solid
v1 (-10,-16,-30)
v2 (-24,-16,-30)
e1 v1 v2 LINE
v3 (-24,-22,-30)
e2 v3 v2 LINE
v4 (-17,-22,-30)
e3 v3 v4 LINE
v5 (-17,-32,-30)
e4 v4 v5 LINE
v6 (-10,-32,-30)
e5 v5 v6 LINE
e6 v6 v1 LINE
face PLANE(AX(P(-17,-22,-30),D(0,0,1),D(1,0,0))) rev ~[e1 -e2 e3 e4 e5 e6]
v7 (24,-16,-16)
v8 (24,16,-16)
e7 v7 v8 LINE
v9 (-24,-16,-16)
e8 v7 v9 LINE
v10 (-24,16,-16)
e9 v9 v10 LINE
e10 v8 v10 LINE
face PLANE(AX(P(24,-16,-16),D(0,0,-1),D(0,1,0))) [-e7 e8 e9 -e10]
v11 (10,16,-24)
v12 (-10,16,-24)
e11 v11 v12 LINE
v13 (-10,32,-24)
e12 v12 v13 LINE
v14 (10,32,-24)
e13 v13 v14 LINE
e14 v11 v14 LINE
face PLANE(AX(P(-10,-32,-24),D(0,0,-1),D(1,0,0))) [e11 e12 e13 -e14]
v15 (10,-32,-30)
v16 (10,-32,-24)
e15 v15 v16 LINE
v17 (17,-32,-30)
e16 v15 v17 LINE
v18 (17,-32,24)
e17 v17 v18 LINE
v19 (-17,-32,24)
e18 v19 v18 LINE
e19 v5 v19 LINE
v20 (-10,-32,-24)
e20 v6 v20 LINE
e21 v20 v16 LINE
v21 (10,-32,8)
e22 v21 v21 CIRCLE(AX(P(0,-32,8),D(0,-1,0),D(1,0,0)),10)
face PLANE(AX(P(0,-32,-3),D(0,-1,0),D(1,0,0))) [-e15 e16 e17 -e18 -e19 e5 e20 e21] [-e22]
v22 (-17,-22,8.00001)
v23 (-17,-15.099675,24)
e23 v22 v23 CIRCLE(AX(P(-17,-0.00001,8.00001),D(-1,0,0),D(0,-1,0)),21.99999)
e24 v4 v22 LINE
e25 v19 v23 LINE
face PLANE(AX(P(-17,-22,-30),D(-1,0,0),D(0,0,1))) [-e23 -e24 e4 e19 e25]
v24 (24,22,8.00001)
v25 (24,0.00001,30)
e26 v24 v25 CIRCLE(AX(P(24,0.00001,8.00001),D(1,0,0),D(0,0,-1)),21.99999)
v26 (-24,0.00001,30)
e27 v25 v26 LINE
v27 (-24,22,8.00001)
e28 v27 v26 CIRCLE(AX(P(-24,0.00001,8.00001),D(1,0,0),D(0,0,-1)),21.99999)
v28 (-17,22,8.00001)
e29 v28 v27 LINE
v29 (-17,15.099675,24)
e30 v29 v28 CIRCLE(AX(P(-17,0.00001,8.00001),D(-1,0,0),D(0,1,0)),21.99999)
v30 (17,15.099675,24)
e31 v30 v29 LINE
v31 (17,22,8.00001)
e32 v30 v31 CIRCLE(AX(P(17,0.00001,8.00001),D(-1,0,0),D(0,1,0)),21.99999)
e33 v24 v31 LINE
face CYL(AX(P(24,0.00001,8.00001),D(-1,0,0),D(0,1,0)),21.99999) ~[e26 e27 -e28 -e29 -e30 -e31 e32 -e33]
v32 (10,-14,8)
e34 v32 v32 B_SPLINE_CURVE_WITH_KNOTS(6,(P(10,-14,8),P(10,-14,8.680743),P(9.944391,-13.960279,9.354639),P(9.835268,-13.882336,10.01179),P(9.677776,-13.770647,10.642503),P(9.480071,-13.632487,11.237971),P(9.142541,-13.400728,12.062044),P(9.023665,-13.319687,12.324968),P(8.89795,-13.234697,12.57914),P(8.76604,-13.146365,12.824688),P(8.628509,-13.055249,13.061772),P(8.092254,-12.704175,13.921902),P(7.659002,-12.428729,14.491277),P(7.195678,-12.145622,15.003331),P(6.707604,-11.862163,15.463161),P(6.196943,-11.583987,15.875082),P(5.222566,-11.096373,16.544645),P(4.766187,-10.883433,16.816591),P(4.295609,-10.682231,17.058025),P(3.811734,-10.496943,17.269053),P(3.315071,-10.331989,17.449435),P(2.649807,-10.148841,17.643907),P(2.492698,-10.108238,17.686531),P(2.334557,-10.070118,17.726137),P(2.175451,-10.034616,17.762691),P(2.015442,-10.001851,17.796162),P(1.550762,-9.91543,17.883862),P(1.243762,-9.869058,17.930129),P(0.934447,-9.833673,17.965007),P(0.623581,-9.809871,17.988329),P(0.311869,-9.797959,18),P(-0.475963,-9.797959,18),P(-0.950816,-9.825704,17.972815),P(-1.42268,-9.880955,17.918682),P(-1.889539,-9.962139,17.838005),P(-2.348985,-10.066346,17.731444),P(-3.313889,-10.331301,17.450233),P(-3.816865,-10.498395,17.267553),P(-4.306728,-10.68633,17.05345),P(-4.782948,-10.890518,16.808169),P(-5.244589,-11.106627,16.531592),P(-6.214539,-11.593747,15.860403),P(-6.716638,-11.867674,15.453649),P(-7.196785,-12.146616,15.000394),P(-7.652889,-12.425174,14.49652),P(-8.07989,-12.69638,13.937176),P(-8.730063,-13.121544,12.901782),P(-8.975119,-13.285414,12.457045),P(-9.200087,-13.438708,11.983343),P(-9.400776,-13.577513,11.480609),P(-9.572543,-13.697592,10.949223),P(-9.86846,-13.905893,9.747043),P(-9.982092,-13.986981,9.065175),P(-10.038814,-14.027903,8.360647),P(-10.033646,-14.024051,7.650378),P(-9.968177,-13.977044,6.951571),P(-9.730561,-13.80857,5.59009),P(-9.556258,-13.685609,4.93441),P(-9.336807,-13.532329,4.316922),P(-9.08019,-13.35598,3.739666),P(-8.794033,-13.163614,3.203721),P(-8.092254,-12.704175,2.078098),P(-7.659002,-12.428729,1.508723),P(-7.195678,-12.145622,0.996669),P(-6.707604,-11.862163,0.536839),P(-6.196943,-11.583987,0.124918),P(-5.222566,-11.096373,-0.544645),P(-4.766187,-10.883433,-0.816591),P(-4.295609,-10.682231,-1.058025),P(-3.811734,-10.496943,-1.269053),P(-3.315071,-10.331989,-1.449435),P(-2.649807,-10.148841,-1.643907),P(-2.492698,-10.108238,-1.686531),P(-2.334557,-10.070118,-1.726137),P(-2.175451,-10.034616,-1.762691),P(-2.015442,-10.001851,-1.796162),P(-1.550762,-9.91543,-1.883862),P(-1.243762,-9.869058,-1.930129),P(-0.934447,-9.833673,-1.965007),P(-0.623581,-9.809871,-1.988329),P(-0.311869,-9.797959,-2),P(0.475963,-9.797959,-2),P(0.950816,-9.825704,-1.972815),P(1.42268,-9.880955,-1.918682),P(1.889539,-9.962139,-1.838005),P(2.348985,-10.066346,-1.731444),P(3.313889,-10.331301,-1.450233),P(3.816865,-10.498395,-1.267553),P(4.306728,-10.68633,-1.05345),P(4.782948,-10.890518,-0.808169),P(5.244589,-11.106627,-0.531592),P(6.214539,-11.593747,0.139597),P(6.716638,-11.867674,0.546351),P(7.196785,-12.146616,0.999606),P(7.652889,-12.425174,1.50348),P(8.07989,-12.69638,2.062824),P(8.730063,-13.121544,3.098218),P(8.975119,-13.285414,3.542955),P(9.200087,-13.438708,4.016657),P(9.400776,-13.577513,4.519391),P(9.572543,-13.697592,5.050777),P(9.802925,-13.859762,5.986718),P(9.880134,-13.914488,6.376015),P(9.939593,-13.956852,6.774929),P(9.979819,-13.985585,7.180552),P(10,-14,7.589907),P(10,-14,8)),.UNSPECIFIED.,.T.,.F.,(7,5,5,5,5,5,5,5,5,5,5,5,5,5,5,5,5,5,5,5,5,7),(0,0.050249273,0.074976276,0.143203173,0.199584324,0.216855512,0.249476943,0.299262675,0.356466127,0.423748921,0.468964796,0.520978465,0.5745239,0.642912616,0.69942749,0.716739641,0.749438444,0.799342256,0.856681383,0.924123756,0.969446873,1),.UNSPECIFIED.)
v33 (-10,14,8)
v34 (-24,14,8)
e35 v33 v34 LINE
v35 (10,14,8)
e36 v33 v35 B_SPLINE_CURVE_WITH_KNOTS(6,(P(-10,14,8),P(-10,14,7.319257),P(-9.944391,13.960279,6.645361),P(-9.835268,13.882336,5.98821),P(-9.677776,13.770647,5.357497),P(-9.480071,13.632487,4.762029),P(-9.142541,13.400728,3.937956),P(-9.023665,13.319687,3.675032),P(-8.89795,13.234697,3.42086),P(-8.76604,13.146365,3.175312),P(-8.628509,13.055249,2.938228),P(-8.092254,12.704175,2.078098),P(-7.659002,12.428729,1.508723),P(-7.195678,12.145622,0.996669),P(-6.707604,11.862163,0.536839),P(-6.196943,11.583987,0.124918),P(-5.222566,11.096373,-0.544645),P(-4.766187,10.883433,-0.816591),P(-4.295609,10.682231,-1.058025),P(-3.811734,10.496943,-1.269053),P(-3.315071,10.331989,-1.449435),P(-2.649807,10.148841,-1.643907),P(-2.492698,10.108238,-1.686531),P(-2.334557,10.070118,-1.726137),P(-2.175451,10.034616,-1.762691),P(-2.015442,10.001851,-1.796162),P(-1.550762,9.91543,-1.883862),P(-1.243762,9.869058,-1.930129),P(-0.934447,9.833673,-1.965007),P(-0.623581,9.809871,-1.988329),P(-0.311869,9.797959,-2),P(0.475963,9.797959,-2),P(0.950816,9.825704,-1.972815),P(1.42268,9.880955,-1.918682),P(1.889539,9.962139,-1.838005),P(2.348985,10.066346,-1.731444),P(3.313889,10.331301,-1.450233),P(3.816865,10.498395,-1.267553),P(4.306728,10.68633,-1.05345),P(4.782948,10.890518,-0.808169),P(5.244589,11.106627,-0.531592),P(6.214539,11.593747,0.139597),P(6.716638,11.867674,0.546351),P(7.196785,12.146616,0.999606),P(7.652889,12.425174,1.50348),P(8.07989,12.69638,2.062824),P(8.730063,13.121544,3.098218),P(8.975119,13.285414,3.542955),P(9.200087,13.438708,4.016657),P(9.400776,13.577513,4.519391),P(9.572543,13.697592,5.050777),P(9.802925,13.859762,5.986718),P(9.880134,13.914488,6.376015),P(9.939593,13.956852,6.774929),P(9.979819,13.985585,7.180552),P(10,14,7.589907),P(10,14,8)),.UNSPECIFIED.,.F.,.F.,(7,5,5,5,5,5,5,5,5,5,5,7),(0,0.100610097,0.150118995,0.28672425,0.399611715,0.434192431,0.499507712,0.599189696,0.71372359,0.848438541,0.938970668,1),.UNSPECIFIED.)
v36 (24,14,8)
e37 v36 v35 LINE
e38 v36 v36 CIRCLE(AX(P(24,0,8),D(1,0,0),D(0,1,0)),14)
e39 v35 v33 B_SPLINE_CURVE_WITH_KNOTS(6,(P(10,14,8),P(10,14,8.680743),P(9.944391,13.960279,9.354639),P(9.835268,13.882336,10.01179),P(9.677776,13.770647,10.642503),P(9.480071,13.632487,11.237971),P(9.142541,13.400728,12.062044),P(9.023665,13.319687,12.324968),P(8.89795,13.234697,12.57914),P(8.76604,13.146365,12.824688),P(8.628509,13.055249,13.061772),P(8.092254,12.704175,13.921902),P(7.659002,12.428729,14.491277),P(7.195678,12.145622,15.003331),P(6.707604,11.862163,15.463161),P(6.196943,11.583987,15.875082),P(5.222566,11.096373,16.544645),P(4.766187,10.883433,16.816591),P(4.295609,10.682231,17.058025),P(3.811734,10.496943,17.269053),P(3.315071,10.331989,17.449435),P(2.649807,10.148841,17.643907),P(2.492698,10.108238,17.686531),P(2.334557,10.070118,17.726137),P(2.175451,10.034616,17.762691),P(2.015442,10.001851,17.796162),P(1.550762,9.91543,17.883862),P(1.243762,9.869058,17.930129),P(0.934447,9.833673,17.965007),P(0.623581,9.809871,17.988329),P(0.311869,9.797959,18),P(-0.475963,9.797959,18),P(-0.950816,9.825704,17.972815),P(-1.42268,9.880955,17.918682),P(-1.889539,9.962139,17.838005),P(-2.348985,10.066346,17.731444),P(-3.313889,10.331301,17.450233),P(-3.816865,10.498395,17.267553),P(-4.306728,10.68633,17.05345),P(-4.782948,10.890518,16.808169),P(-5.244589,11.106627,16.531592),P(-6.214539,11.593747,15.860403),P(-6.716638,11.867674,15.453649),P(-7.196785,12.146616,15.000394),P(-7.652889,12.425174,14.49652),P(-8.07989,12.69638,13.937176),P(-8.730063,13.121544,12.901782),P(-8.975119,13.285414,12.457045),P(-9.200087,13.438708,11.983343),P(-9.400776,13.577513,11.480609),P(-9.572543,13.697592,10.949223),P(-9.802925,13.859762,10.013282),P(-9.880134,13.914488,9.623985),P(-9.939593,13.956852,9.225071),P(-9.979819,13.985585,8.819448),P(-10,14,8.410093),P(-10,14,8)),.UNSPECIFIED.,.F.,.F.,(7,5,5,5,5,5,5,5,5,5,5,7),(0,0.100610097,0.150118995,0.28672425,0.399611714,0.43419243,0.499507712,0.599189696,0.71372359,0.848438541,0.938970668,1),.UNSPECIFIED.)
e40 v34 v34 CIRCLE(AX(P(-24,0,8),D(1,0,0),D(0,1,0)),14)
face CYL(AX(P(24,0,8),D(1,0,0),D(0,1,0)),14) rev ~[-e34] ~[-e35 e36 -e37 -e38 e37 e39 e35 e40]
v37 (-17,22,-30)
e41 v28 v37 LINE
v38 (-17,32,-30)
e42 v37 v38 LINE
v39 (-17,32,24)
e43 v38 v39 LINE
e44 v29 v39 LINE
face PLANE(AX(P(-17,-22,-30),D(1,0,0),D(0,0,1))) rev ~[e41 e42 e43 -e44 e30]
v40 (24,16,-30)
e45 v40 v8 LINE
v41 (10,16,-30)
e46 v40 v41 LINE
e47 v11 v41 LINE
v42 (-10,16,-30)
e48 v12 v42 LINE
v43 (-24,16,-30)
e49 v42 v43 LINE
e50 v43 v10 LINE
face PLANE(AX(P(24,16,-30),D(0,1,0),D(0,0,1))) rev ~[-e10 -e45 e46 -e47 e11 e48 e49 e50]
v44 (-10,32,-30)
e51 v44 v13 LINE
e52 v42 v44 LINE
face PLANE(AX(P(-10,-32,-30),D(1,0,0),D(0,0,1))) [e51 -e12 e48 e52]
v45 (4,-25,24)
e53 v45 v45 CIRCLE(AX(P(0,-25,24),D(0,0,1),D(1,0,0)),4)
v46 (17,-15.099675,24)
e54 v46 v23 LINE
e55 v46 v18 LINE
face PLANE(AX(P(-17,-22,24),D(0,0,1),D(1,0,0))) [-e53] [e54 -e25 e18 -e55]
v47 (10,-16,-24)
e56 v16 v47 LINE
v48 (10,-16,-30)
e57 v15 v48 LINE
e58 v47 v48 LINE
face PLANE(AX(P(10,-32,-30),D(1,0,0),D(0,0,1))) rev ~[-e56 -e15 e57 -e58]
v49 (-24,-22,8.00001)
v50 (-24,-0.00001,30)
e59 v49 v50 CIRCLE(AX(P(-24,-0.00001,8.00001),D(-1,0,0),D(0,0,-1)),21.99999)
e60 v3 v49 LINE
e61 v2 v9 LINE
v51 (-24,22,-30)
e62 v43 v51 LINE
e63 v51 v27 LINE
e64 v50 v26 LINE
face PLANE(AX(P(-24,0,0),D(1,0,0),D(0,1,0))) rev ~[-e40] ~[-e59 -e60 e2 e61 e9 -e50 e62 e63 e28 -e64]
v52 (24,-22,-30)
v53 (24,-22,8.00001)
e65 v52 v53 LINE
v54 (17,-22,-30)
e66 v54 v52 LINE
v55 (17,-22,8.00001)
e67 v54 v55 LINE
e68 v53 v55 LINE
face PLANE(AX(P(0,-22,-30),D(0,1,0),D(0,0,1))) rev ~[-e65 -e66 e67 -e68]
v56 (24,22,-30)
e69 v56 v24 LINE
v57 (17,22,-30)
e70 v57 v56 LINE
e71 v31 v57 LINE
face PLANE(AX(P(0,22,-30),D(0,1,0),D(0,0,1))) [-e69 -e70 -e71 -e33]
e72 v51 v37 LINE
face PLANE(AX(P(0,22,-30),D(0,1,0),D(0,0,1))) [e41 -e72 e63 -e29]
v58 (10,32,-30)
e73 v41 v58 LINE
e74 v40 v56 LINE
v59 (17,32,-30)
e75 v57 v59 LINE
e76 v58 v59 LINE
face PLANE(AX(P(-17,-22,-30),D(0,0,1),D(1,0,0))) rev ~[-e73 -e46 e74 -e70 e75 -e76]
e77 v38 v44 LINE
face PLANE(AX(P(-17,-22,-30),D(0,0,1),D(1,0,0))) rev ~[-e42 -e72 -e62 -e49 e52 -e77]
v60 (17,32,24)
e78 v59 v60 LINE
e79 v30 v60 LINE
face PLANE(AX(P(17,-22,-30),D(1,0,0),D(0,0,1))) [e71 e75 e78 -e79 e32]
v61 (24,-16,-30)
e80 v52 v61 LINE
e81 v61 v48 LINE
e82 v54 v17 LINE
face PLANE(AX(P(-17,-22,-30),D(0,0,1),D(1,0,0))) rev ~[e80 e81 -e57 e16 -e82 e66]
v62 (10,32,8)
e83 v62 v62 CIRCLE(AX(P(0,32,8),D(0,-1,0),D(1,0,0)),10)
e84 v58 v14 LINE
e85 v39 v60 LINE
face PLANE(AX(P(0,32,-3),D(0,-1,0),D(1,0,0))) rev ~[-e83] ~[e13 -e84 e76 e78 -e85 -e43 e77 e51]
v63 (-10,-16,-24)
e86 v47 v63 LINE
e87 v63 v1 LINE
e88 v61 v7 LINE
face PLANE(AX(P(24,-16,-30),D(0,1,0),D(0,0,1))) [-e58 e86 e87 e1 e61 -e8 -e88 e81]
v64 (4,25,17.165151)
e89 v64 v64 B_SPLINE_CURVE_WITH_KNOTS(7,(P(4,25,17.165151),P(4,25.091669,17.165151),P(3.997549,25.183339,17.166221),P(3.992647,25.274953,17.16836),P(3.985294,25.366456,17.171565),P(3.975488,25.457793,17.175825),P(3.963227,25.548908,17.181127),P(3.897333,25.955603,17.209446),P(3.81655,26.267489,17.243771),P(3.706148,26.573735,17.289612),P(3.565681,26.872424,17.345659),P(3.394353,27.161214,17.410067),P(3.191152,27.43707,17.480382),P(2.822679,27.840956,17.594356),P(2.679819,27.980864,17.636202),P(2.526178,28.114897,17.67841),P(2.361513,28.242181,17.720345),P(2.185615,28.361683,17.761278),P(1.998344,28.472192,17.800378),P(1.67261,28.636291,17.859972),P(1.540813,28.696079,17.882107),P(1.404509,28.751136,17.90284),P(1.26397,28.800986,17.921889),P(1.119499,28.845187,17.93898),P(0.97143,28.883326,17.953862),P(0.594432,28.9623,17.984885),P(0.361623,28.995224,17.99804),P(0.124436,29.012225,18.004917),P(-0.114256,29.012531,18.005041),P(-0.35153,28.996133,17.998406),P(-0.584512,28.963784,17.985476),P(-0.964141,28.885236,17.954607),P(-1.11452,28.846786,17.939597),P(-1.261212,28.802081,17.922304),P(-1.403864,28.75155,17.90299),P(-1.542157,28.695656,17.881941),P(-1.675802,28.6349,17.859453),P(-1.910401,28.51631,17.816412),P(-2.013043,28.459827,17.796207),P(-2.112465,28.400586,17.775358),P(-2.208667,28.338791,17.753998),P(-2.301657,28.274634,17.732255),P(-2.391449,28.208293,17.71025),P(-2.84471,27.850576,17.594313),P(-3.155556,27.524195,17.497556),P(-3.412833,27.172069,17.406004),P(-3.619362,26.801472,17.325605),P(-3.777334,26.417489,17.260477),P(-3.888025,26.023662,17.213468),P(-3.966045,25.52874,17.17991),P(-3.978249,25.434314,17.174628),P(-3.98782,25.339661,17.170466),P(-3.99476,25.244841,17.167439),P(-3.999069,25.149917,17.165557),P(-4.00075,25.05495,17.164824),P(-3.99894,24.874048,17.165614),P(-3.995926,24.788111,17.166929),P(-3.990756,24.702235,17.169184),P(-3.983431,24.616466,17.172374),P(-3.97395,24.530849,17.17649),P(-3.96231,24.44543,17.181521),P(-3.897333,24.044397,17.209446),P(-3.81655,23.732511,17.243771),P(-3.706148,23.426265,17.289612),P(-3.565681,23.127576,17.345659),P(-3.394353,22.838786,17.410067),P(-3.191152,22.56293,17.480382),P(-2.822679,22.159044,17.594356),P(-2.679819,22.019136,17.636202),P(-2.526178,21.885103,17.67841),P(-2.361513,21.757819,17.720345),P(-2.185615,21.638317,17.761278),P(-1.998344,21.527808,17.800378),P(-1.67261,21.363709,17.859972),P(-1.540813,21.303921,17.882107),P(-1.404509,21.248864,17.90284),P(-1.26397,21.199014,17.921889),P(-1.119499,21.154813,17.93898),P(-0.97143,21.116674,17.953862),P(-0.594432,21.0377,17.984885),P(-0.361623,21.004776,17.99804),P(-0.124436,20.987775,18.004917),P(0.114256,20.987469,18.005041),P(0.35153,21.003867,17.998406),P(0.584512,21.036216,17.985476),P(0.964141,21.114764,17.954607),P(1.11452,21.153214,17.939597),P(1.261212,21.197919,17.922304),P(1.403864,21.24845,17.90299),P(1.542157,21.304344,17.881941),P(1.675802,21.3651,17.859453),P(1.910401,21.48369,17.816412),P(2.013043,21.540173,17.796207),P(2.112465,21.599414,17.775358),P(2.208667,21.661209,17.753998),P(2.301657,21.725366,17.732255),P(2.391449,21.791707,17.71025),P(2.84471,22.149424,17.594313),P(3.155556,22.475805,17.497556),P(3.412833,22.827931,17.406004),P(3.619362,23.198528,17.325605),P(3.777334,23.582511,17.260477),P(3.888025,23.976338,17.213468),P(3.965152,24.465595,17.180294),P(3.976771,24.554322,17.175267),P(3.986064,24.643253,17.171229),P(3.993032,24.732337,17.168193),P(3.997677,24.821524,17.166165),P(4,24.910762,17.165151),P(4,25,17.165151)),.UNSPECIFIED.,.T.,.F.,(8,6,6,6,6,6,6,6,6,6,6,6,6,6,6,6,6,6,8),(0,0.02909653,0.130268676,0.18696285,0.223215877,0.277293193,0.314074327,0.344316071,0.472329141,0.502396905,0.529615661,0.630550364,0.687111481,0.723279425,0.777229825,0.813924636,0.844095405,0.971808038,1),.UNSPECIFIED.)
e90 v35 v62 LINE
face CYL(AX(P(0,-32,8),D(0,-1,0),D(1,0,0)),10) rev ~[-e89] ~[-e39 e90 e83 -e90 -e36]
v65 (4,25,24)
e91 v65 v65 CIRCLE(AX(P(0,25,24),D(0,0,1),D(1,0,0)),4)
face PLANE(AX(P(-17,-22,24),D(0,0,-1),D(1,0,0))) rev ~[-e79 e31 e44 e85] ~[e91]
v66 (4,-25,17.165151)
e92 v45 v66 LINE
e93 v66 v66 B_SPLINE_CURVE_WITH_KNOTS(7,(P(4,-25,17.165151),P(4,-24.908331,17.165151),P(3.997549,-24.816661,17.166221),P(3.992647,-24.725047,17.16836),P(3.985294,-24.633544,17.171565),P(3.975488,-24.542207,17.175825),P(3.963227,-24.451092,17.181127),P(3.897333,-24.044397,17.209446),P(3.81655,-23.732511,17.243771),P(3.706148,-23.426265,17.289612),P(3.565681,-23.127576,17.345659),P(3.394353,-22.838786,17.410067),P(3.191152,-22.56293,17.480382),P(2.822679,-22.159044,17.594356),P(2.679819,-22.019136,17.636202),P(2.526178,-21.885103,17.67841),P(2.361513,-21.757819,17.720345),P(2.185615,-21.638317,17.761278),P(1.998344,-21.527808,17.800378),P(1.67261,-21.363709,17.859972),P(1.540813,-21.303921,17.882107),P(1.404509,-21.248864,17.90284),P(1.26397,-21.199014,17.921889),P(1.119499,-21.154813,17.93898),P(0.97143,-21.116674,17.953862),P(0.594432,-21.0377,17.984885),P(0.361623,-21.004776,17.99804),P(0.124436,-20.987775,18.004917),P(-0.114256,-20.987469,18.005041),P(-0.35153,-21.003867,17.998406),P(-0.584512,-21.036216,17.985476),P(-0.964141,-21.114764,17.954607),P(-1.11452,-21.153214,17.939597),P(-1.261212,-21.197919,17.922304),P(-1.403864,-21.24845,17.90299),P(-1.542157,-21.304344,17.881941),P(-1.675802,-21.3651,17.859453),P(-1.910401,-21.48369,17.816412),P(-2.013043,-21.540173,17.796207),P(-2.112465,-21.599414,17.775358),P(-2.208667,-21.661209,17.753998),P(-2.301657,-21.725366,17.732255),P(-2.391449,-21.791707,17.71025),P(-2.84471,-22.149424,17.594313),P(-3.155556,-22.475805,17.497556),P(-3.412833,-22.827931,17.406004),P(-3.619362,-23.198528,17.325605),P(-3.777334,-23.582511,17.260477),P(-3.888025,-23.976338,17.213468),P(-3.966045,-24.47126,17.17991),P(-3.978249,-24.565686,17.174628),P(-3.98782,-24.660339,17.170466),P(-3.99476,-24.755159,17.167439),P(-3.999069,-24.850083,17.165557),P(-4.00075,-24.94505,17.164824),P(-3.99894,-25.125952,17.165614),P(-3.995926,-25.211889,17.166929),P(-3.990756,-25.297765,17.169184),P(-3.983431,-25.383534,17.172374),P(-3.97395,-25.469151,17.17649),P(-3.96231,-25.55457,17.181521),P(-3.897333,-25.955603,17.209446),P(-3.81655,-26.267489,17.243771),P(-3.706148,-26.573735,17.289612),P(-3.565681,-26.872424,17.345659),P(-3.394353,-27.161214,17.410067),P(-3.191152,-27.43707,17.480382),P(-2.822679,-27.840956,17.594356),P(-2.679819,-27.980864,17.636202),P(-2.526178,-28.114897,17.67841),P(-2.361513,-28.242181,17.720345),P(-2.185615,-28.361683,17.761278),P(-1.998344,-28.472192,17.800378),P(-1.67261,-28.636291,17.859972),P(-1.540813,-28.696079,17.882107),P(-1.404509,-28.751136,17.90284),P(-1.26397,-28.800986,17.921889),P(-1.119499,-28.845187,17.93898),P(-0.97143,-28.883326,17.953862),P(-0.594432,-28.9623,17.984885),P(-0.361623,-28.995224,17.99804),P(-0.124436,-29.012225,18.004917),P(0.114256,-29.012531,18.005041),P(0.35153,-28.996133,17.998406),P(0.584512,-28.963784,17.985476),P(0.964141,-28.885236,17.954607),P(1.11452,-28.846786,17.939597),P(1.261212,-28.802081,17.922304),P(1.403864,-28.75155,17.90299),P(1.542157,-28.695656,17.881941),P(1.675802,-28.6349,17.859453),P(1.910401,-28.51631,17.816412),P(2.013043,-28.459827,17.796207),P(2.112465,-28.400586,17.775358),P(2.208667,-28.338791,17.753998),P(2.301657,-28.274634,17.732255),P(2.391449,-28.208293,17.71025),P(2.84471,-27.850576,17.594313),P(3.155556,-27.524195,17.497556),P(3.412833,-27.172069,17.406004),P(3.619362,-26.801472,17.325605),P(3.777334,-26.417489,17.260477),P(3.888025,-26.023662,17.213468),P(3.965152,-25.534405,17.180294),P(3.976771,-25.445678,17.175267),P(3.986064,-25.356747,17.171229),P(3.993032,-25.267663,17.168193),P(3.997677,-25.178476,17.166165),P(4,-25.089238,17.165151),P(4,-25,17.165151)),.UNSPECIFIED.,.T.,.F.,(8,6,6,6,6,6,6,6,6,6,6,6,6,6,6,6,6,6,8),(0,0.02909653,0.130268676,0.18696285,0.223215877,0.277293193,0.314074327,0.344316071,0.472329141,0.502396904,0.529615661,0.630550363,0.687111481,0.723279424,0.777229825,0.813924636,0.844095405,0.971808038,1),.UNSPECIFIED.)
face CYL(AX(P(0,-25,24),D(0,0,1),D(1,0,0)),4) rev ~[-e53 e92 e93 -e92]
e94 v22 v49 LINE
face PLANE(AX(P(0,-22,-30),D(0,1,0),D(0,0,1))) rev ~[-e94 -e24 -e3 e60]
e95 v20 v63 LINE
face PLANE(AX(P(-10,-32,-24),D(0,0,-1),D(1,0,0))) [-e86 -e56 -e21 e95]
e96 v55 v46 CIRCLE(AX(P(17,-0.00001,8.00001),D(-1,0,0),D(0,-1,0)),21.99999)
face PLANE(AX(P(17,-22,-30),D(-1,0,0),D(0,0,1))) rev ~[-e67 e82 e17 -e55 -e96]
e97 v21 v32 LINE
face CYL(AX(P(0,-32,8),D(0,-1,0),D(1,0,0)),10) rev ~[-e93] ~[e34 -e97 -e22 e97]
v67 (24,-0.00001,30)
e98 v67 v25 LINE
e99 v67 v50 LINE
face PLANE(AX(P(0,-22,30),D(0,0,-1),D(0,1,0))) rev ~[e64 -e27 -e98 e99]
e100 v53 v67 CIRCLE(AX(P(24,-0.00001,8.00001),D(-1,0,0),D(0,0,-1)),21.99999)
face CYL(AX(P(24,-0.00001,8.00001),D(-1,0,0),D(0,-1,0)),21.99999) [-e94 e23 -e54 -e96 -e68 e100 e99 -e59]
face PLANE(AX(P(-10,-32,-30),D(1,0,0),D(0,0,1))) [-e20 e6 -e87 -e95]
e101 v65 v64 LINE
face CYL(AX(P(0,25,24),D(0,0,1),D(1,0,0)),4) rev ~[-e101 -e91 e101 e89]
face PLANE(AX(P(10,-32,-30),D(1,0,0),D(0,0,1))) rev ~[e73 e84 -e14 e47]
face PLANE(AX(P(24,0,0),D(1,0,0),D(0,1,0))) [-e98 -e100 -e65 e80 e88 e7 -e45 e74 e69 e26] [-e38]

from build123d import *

# Parameters (mm, degrees)
F0_W          = 44
F0_H          = 60
F1_DEPTH      = 24
F2_R          = 21.99999
F3_W          = 34
F3_H          = 54
F4_DEPTH      = 10
F4_DEPTH_BACK = 54
F5_R          = 14
F5_W          = 32
F5_H          = 14
F6_DEPTH      = 48.001
F8_R          = 10
F8_W          = 20
F8_H          = 6
F9_DEPTH      = 64.001
F7_R          = 4
F10_DEPTH     = 7.8348487101


# Not quite as in the source:
# - a fillet or chamfer is up to 0.001 mm smaller than in the source, because OpenCascade refuses the exact size


with BuildPart() as f1:
    # F0 (on Right) → F1 (new body, symmetric)
    with BuildSketch(Plane.YZ):
        Rectangle(F0_W, F0_H)
    extrude(amount=F1_DEPTH, both=True)

    # F2 (radius 22 in the source; OpenCascade refuses exactly that, so slightly less here)
    f2_edges = [f1.edges().sort_by_distance(p)[0] for p in [
        (0, -22, 30),
        (0, 22, 30),
    ]]
    fillet(f2_edges, radius=F2_R)

    # F3 (on face) → F4 (join, two sides)
    with BuildSketch(Plane.XZ.offset(22)) as f4_sk:
        with Locations((0, -3)):
            Rectangle(F3_W, F3_H)
    extrude(amount=F4_DEPTH)
    extrude(f4_sk.sketch, amount=-F4_DEPTH_BACK)

    # F5 (on face) → F6 (cut, through all)
    with BuildSketch(Plane.YZ.offset(24)):
        with Locations((0, 8)):
            Circle(F5_R)
        with Locations((0, -23)):
            Rectangle(F5_W, F5_H)
    extrude(amount=-F6_DEPTH, mode=Mode.SUBTRACT)

    # F8 (on face) → F9 (cut, through all)
    with BuildSketch(Plane.XZ.offset(32)):
        with Locations((0, 8)):
            Circle(F8_R)
        with Locations((0, -27)):
            Rectangle(F8_W, F8_H)
    extrude(amount=-F9_DEPTH, mode=Mode.SUBTRACT)

    # F7 (on face) → F10 (cut, up to face)
    with BuildSketch(Plane.XY.offset(24)):
        with Locations((0, -25)):
            Circle(F7_R)
        with Locations((0, 25)):
            Circle(F7_R)
    extrude(amount=-F10_DEPTH, mode=Mode.SUBTRACT)


solid = f1.part
